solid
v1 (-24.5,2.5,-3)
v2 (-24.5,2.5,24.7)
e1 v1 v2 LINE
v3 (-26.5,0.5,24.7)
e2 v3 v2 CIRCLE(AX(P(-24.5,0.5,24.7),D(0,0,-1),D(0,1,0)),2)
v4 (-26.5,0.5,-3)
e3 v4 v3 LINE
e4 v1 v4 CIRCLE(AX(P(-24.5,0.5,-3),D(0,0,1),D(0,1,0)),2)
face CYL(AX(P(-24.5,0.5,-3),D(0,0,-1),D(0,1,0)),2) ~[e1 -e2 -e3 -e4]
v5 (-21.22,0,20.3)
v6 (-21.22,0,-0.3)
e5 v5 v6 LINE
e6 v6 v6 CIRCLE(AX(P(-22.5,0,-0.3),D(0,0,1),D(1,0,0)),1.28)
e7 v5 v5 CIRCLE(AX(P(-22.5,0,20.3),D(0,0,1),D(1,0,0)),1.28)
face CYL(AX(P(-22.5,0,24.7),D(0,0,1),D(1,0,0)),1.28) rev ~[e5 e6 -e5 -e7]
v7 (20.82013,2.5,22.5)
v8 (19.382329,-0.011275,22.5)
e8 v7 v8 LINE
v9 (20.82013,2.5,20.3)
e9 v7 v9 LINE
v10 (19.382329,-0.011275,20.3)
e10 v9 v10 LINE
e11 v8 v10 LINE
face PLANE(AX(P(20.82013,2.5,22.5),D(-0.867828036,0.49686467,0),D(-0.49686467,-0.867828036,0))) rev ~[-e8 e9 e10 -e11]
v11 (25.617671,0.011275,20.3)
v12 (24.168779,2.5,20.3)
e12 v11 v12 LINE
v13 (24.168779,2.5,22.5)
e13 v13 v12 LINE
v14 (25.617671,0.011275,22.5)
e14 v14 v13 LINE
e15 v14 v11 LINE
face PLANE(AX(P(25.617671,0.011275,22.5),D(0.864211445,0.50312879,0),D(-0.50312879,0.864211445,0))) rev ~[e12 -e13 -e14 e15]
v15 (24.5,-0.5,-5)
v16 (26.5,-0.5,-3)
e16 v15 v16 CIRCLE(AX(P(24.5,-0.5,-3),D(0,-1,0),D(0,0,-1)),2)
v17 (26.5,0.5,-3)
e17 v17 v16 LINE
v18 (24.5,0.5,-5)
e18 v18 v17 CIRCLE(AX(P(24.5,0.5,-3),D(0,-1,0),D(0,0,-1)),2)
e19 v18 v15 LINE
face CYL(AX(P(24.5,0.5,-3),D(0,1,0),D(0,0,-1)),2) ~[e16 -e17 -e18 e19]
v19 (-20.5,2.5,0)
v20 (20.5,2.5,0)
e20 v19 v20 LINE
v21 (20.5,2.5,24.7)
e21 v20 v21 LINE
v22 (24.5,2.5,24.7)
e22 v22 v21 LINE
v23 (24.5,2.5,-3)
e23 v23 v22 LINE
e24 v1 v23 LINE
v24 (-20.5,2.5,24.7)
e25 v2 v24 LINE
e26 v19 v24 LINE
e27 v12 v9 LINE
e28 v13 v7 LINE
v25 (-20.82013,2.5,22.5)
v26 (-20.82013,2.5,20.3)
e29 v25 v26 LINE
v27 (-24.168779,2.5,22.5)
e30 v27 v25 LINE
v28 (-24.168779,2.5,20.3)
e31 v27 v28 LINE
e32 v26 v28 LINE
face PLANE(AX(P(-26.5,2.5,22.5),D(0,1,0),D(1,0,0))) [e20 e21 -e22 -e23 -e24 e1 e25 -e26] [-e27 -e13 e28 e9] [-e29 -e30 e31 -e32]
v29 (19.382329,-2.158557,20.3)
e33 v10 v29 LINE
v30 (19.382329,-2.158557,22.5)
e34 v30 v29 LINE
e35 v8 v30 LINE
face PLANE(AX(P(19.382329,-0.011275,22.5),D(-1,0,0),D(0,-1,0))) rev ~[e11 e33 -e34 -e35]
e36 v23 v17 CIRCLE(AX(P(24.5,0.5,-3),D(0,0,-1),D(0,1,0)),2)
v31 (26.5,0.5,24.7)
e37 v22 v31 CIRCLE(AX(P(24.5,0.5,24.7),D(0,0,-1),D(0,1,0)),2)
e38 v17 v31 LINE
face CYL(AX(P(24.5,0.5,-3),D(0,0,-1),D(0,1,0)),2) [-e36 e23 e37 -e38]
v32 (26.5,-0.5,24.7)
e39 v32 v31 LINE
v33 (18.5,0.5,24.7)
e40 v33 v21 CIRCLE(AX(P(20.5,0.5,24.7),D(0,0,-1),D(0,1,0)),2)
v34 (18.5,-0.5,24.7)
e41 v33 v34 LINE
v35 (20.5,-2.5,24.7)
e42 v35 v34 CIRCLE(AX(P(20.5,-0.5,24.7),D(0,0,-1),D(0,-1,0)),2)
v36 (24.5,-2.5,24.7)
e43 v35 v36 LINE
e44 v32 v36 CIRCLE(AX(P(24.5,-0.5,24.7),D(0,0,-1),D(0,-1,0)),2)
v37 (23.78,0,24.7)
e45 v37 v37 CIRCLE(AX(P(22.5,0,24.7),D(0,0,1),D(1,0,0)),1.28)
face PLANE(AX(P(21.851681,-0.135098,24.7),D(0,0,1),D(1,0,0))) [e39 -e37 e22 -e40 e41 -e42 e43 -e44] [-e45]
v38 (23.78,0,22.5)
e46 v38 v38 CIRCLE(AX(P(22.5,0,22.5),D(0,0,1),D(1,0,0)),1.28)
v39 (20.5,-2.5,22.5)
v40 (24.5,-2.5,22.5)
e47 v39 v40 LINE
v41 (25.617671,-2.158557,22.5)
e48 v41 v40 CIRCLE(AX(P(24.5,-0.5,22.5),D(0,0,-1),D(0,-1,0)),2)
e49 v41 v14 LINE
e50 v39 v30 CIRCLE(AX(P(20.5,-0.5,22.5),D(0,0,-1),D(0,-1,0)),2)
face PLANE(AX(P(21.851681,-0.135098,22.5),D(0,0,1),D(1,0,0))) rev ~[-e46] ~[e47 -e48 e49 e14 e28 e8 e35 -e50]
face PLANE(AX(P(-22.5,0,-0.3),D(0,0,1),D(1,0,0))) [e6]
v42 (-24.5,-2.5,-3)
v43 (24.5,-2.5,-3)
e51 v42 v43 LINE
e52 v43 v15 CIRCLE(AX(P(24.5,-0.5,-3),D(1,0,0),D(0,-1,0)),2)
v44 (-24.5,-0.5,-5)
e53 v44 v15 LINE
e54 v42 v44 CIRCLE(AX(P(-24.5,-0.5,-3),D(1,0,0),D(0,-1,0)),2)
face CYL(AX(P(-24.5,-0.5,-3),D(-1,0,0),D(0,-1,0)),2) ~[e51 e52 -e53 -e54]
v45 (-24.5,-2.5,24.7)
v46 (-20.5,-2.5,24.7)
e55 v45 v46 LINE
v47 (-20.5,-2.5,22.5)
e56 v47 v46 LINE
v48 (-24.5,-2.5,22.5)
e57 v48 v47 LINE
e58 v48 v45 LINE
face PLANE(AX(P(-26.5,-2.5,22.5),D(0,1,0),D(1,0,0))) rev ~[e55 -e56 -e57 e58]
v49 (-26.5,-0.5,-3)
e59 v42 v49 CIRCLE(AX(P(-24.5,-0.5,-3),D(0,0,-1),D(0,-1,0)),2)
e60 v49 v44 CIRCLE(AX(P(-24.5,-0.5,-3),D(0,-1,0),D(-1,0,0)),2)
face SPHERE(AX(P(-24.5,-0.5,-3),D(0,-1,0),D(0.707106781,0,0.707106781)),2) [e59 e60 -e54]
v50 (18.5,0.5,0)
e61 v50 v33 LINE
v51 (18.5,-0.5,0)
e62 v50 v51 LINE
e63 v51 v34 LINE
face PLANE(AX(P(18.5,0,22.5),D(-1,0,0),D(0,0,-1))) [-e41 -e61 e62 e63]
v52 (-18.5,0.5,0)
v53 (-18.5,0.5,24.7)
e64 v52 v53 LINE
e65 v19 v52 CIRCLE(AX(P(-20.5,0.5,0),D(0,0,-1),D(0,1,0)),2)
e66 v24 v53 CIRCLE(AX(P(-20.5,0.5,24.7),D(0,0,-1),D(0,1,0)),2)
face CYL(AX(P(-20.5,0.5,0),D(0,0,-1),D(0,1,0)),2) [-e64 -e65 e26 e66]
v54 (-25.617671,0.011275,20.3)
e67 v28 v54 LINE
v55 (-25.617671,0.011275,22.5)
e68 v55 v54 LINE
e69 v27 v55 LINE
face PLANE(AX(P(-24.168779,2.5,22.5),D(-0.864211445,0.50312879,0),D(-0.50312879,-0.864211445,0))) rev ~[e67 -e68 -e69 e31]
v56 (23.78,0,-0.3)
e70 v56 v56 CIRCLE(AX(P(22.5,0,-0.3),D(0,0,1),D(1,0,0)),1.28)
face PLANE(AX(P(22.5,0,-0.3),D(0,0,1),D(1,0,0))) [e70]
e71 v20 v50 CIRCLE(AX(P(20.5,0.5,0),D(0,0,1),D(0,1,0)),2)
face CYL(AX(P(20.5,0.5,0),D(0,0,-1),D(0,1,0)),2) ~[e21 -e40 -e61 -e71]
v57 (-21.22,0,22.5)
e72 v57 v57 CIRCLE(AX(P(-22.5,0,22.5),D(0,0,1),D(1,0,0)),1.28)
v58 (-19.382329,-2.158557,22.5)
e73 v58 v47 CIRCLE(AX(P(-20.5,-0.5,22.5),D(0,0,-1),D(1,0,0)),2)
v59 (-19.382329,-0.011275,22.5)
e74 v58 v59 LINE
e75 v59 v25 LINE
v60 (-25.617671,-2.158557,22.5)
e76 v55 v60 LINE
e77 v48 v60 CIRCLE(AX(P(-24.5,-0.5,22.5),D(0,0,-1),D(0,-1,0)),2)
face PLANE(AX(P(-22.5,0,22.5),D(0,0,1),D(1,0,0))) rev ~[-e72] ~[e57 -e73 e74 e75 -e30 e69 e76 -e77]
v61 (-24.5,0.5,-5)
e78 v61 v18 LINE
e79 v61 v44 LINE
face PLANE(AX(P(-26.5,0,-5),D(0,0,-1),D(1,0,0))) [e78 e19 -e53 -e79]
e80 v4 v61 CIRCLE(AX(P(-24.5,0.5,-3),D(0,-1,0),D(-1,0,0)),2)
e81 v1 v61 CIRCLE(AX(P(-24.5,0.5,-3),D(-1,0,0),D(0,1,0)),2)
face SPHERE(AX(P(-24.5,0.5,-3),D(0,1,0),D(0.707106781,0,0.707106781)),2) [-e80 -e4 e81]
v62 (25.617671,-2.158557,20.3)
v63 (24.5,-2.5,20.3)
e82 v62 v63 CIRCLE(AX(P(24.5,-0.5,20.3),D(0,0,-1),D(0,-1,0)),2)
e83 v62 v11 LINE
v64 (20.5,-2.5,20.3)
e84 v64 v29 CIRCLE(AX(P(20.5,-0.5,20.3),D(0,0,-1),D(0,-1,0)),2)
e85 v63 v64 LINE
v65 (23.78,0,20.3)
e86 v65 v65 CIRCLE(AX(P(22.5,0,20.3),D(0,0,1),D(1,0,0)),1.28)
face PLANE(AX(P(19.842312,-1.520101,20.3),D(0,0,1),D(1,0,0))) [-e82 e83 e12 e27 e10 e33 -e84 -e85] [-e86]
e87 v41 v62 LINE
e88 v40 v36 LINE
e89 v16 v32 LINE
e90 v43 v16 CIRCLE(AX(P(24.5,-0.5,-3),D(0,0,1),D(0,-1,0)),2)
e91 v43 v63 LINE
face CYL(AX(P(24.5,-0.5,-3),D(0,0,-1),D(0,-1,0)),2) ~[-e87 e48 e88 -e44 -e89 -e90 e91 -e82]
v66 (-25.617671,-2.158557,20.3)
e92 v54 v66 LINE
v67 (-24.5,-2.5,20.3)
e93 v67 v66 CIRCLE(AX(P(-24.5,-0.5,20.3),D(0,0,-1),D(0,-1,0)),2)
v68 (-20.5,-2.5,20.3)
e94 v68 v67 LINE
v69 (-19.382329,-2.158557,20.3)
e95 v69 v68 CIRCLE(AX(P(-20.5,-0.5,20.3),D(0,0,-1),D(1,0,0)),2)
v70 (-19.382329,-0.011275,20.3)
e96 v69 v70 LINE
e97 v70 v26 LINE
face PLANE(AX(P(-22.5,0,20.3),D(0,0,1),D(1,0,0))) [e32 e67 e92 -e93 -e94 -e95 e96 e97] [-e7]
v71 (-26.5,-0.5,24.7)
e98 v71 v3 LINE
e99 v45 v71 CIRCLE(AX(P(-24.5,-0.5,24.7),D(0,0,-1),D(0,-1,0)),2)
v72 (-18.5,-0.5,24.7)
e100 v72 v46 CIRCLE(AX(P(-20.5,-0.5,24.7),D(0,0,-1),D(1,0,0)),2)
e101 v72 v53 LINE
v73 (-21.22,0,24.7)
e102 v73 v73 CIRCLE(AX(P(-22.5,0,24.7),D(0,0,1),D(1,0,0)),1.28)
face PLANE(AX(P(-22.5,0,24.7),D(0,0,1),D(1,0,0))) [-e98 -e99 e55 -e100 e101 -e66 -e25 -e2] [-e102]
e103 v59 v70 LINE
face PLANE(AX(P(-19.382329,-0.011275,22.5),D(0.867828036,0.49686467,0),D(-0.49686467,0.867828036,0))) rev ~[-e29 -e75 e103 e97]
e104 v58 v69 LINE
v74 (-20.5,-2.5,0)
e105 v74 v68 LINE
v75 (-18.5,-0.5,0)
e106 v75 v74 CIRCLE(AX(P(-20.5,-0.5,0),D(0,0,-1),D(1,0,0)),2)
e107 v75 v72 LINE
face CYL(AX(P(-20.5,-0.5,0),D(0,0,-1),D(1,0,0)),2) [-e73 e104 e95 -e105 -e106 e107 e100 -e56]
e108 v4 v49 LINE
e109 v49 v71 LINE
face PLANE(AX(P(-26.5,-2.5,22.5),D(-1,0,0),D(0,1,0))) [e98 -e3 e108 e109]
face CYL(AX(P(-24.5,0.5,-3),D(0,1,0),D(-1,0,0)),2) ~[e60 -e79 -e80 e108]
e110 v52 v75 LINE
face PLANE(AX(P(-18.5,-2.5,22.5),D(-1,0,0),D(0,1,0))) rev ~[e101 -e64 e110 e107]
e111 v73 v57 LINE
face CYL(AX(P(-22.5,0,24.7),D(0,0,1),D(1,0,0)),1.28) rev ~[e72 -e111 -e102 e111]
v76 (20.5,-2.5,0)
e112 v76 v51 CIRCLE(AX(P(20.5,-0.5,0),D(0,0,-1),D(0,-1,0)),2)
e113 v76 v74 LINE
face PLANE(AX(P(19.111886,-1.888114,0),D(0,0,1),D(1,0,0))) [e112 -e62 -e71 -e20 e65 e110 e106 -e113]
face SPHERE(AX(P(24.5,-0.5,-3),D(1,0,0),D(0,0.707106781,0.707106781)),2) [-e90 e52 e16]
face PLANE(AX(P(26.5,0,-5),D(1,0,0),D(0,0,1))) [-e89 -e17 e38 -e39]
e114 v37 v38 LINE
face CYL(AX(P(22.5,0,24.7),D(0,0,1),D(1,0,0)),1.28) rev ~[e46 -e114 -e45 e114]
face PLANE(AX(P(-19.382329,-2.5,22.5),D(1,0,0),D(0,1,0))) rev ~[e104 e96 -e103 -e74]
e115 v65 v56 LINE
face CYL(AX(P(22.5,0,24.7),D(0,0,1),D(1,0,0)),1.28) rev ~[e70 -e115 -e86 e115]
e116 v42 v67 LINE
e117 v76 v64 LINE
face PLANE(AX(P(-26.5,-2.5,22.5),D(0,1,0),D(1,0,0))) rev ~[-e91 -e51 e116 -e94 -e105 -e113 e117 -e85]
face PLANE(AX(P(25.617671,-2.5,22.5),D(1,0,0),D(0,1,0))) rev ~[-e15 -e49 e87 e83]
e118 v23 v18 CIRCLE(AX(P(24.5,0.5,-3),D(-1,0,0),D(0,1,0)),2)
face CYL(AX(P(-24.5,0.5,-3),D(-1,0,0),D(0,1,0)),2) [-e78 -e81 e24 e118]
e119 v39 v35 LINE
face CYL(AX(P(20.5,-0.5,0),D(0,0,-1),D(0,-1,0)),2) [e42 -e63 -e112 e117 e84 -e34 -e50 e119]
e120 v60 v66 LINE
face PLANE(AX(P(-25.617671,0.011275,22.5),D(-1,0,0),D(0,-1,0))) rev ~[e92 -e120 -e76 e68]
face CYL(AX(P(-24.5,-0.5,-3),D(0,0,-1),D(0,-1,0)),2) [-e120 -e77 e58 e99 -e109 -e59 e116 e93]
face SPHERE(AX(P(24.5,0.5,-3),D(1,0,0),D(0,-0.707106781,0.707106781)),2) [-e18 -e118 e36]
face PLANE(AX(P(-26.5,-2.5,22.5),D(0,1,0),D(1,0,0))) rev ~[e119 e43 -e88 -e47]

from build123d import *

# Parameters (mm, degrees)
F0_W         = 5.2
F0_H         = 2
F1_DEPTH     = 2.5
F3_DEPTH     = 2.2
F4_W         = 8
F4_H         = 5
F5_DEPTH     = 2.2
F6_R         = 1.28
F7_DEPTH     = 25
F8_T1_DEPTH  = 1
F8_T3_DEPTH  = 49
F8_T5_DEPTH  = 29.7
F8_T7_DEPTH  = 32.7
F8_S11_W     = 2
F8_S11_H     = 2
F8_T12_DEPTH = 2
F8_S17_W     = 2
F8_S17_H     = 2
F8_T18_DEPTH = 2
F8_S23_W     = 2
F8_S23_H     = 2
F8_T24_DEPTH = 2
F8_S29_W     = 2
F8_S29_H     = 2
F8_T30_DEPTH = 2


# Not quite as in the source:
# - a fillet or chamfer that OpenCascade refuses, or shapes differently, is made with other operations: its cross-section is extruded or revolved along the edge and cut away or added


with BuildPart() as f1:
    # F0 (on Front) → F1 (new body, symmetric)
    with BuildSketch(Plane.XZ):
        Polygon((18.5, 0), (0, 0), (0, -5), (26.5, -5), (26.5, 0), (22.5, 0), align=None)
        Polygon((18.5, 22.5), (18.5, 0), (22.5, 0), (26.5, 0), (26.5, 22.5), (25.1, 22.5), (25.1, 20.5), (19.9, 20.5), (19.9, 22.5), align=None)
        with Locations((22.5, 21.5)):
            Rectangle(F0_W, F0_H)
        Polygon((0, -5), (0, 0), (-18.5, 0), (-22.5, 0), (-26.5, 0), (-26.5, -5), align=None)
        Polygon((-22.5, 0), (-18.5, 0), (-18.5, 22.5), (-19.9, 22.5), (-19.9, 20.5), (-25.1, 20.5), (-25.1, 22.5), (-26.5, 22.5), (-26.5, 0), align=None)
        with Locations((-22.5, 21.5)):
            Rectangle(F0_W, F0_H)
    extrude(amount=F1_DEPTH, both=True)

    # F2 (on face) → F3 (cut)
    with BuildSketch(Plane.XY.offset(22.5)):
        Polygon((19.3823289357, -2.5), (20.8312208665, -2.5), (19.3823289357, -0.011275415), align=None)
        Polygon((20.8312208665, -2.5), (24.1798700484, -2.5), (25.6176710643, 0.011275415), (24.1687791335, 2.5), (20.8201299516, 2.5), (19.3823289357, -0.011275415), align=None)
        Polygon((24.068600328, -2.6943446348), (24.1798700484, -2.5), (20.8312208665, -2.5), (20.9509292637, -2.7056200498), align=None)
        Polygon((24.1798700484, -2.5), (25.6176710643, -2.5), (25.6176710643, 0.011275415), align=None)
        Polygon((-24.1798700484, -2.5), (-20.8312208665, -2.5), (-19.3823289357, -0.011275415), (-20.8201299516, 2.5), (-24.1687791335, 2.5), (-25.6176710643, 0.011275415), align=None)
        Polygon((-20.9509292637, -2.7056200498), (-20.8312208665, -2.5), (-24.1798700484, -2.5), (-24.068600328, -2.6943446348), align=None)
        Polygon((-25.6176710643, -2.5), (-24.1798700484, -2.5), (-25.6176710643, 0.011275415), align=None)
        Polygon((-20.8312208665, -2.5), (-19.3823289357, -2.5), (-19.3823289357, -0.011275415), align=None)
    extrude(amount=-F3_DEPTH, mode=Mode.SUBTRACT)

    # F4 (on face) → F5 (join)
    with BuildSketch(Plane.XY.offset(22.5)):
        with Locations((-22.5, 0)):
            Rectangle(F4_W, F4_H)
        Polygon((25.6176710643, 0.011275415), (24.1687791335, 2.5), (18.5, 2.5), (18.5, -2.5), (25.6176710643, -2.5), align=None)
        Polygon((26.5, -2.5), (26.5, 2.5), (24.1687791335, 2.5), (25.6176710643, 0.011275415), (25.6176710643, -2.5), align=None)
    extrude(amount=F5_DEPTH)

    # F6 (on face) → F7 (cut)
    with BuildSketch(Plane.XY.offset(24.7)):
        with Locations((-22.5, 0)):
            Circle(F6_R)
        with Locations((22.5, 0)):
            Circle(F6_R)
    extrude(amount=-F7_DEPTH, mode=Mode.SUBTRACT)

    # F8: fillet of radius 2 on 12 edges, made by hand

    # F8_s2 → F8_t1 (cut)
    with BuildSketch(Plane.XZ.offset(-0.5)):
        with BuildLine():
            ThreePointArc((-26.5, -3), (-25.9142135624, -4.4142135624), (-24.5, -5))
            Line((-24.5, -5), (-26.5, -5))
            Line((-26.5, -5), (-26.5, -3))
        make_face()
        with BuildLine():
            ThreePointArc((24.5, -5), (25.9142135624, -4.4142135624), (26.5, -3))
            Line((26.5, -3), (26.5, -5))
            Line((26.5, -5), (24.5, -5))
        make_face()
    extrude(amount=F8_T1_DEPTH, mode=Mode.SUBTRACT)

    # F8_s4 → F8_t3 (cut)
    with BuildSketch(Plane.YZ.offset(-24.5)):
        with BuildLine():
            ThreePointArc((2.5, -3), (1.9142135624, -4.4142135624), (0.5, -5))
            Line((0.5, -5), (2.5, -5))
            Line((2.5, -5), (2.5, -3))
        make_face()
        with BuildLine():
            ThreePointArc((-2.5, -3), (-1.9142135624, -4.4142135624), (-0.5, -5))
            Line((-0.5, -5), (-2.5, -5))
            Line((-2.5, -5), (-2.5, -3))
        make_face()
    extrude(amount=F8_T3_DEPTH, mode=Mode.SUBTRACT)

    # F8_s6 → F8_t5 (cut)
    with BuildSketch(Plane.XY):
        with BuildLine():
            ThreePointArc((20.5, -2.5), (19.0857864376, -1.9142135624), (18.5, -0.5))
            Line((18.5, -0.5), (18.5, -2.5))
            Line((18.5, -2.5), (20.5, -2.5))
        make_face()
        with BuildLine():
            ThreePointArc((20.5, 2.5), (19.0857864376, 1.9142135624), (18.5, 0.5))
            Line((18.5, 0.5), (18.5, 2.5))
            Line((18.5, 2.5), (20.5, 2.5))
        make_face()
        with BuildLine():
            ThreePointArc((-18.5, -0.5), (-19.0857864376, -1.9142135624), (-20.5, -2.5))
            Line((-20.5, -2.5), (-18.5, -2.5))
            Line((-18.5, -2.5), (-18.5, -0.5))
        make_face()
        with BuildLine():
            ThreePointArc((-20.5, 2.5), (-19.0857864376, 1.9142135624), (-18.5, 0.5))
            Line((-18.5, 0.5), (-18.5, 2.5))
            Line((-18.5, 2.5), (-20.5, 2.5))
        make_face()
    extrude(amount=F8_T5_DEPTH, mode=Mode.SUBTRACT)

    # F8_s8 → F8_t7 (cut)
    with BuildSketch(Plane.XY.offset(-3)):
        with BuildLine():
            ThreePointArc((24.5, -2.5), (25.9142135624, -1.9142135624), (26.5, -0.5))
            Line((26.5, -0.5), (26.5, -2.5))
            Line((26.5, -2.5), (24.5, -2.5))
        make_face()
        with BuildLine():
            ThreePointArc((24.5, 2.5), (25.9142135624, 1.9142135624), (26.5, 0.5))
            Line((26.5, 0.5), (26.5, 2.5))
            Line((26.5, 2.5), (24.5, 2.5))
        make_face()
        with BuildLine():
            ThreePointArc((-24.5, -2.5), (-25.9142135624, -1.9142135624), (-26.5, -0.5))
            Line((-26.5, -0.5), (-26.5, -2.5))
            Line((-26.5, -2.5), (-24.5, -2.5))
        make_face()
        with BuildLine():
            ThreePointArc((-24.5, 2.5), (-25.9142135624, 1.9142135624), (-26.5, 0.5))
            Line((-26.5, 0.5), (-26.5, 2.5))
            Line((-26.5, 2.5), (-24.5, 2.5))
        make_face()
    extrude(amount=F8_T7_DEPTH, mode=Mode.SUBTRACT)


with BuildPart() as f8_tool10:
    # F8_s11 → F8_t12 (new body)
    with BuildSketch(Plane.XZ.offset(-0.5)):
        with Locations((-25.5, -4)):
            Rectangle(F8_S11_W, F8_S11_H)
    extrude(amount=-F8_T12_DEPTH)

    # F8_s13 → F8_t14 (revolve, cut)
    with BuildSketch(Plane(origin=(-24.5, 0.5, -3), x_dir=(0.7071067812, 0, 0.7071067812), z_dir=(-0.7071067812, 0, 0.7071067812))):
        with BuildLine():
            ThreePointArc((0, -2), (2, 0), (0, 2))
            Line((0, 2), (0, -2))
        make_face()
    revolve(axis=Axis((-24.5, 0.5, -3), (0, 1, 0)), mode=Mode.SUBTRACT)


with BuildPart() as f1_1:
    add(f1.part)

    # F8_t9: cut F8_tool10
    add(f8_tool10.part, mode=Mode.SUBTRACT)


with BuildPart() as f8_tool16:
    # F8_s17 → F8_t18 (new body)
    with BuildSketch(Plane.XZ.offset(0.5)):
        with Locations((-25.5, -4)):
            Rectangle(F8_S17_W, F8_S17_H)
    extrude(amount=F8_T18_DEPTH)

    # F8_s19 → F8_t20 (revolve, cut)
    with BuildSketch(Plane(origin=(-24.5, -0.5, -3), x_dir=(0.7071067812, 0, 0.7071067812), z_dir=(0.7071067812, 0, -0.7071067812))):
        with BuildLine():
            ThreePointArc((0, -2), (2, 0), (0, 2))
            Line((0, 2), (0, -2))
        make_face()
    revolve(axis=Axis((-24.5, -0.5, -3), (0, -1, 0)), mode=Mode.SUBTRACT)


with BuildPart() as f1_2:
    add(f1_1.part)

    # F8_t15: cut F8_tool16
    add(f8_tool16.part, mode=Mode.SUBTRACT)


with BuildPart() as f8_tool22:
    # F8_s23 → F8_t24 (new body)
    with BuildSketch(Plane.YZ.offset(24.5)):
        with Locations((1.5, -4)):
            Rectangle(F8_S23_W, F8_S23_H)
    extrude(amount=F8_T24_DEPTH)

    # F8_s25 → F8_t26 (revolve, cut)
    with BuildSketch(Plane(origin=(24.5, 0.5, -3), x_dir=(0, -0.7071067812, 0.7071067812), z_dir=(0, 0.7071067812, 0.7071067812))):
        with BuildLine():
            ThreePointArc((0, -2), (2, 0), (0, 2))
            Line((0, 2), (0, -2))
        make_face()
    revolve(axis=Axis((24.5, 0.5, -3), (1, 0, 0)), mode=Mode.SUBTRACT)


with BuildPart() as f1_3:
    add(f1_2.part)

    # F8_t21: cut F8_tool22
    add(f8_tool22.part, mode=Mode.SUBTRACT)


with BuildPart() as f8_tool28:
    # F8_s29 → F8_t30 (new body)
    with BuildSketch(Plane.YZ.offset(24.5)):
        with Locations((-1.5, -4)):
            Rectangle(F8_S29_W, F8_S29_H)
    extrude(amount=F8_T30_DEPTH)

    # F8_s31 → F8_t32 (revolve, cut)
    with BuildSketch(Plane(origin=(24.5, -0.5, -3), x_dir=(0, 0.7071067812, 0.7071067812), z_dir=(0, 0.7071067812, -0.7071067812))):
        with BuildLine():
            ThreePointArc((0, -2), (2, 0), (0, 2))
            Line((0, 2), (0, -2))
        make_face()
    revolve(axis=Axis((24.5, -0.5, -3), (1, 0, 0)), mode=Mode.SUBTRACT)


with BuildPart() as f1_4:
    add(f1_3.part)

    # F8_t27: cut F8_tool28
    add(f8_tool28.part, mode=Mode.SUBTRACT)


solid = f1_4.part
